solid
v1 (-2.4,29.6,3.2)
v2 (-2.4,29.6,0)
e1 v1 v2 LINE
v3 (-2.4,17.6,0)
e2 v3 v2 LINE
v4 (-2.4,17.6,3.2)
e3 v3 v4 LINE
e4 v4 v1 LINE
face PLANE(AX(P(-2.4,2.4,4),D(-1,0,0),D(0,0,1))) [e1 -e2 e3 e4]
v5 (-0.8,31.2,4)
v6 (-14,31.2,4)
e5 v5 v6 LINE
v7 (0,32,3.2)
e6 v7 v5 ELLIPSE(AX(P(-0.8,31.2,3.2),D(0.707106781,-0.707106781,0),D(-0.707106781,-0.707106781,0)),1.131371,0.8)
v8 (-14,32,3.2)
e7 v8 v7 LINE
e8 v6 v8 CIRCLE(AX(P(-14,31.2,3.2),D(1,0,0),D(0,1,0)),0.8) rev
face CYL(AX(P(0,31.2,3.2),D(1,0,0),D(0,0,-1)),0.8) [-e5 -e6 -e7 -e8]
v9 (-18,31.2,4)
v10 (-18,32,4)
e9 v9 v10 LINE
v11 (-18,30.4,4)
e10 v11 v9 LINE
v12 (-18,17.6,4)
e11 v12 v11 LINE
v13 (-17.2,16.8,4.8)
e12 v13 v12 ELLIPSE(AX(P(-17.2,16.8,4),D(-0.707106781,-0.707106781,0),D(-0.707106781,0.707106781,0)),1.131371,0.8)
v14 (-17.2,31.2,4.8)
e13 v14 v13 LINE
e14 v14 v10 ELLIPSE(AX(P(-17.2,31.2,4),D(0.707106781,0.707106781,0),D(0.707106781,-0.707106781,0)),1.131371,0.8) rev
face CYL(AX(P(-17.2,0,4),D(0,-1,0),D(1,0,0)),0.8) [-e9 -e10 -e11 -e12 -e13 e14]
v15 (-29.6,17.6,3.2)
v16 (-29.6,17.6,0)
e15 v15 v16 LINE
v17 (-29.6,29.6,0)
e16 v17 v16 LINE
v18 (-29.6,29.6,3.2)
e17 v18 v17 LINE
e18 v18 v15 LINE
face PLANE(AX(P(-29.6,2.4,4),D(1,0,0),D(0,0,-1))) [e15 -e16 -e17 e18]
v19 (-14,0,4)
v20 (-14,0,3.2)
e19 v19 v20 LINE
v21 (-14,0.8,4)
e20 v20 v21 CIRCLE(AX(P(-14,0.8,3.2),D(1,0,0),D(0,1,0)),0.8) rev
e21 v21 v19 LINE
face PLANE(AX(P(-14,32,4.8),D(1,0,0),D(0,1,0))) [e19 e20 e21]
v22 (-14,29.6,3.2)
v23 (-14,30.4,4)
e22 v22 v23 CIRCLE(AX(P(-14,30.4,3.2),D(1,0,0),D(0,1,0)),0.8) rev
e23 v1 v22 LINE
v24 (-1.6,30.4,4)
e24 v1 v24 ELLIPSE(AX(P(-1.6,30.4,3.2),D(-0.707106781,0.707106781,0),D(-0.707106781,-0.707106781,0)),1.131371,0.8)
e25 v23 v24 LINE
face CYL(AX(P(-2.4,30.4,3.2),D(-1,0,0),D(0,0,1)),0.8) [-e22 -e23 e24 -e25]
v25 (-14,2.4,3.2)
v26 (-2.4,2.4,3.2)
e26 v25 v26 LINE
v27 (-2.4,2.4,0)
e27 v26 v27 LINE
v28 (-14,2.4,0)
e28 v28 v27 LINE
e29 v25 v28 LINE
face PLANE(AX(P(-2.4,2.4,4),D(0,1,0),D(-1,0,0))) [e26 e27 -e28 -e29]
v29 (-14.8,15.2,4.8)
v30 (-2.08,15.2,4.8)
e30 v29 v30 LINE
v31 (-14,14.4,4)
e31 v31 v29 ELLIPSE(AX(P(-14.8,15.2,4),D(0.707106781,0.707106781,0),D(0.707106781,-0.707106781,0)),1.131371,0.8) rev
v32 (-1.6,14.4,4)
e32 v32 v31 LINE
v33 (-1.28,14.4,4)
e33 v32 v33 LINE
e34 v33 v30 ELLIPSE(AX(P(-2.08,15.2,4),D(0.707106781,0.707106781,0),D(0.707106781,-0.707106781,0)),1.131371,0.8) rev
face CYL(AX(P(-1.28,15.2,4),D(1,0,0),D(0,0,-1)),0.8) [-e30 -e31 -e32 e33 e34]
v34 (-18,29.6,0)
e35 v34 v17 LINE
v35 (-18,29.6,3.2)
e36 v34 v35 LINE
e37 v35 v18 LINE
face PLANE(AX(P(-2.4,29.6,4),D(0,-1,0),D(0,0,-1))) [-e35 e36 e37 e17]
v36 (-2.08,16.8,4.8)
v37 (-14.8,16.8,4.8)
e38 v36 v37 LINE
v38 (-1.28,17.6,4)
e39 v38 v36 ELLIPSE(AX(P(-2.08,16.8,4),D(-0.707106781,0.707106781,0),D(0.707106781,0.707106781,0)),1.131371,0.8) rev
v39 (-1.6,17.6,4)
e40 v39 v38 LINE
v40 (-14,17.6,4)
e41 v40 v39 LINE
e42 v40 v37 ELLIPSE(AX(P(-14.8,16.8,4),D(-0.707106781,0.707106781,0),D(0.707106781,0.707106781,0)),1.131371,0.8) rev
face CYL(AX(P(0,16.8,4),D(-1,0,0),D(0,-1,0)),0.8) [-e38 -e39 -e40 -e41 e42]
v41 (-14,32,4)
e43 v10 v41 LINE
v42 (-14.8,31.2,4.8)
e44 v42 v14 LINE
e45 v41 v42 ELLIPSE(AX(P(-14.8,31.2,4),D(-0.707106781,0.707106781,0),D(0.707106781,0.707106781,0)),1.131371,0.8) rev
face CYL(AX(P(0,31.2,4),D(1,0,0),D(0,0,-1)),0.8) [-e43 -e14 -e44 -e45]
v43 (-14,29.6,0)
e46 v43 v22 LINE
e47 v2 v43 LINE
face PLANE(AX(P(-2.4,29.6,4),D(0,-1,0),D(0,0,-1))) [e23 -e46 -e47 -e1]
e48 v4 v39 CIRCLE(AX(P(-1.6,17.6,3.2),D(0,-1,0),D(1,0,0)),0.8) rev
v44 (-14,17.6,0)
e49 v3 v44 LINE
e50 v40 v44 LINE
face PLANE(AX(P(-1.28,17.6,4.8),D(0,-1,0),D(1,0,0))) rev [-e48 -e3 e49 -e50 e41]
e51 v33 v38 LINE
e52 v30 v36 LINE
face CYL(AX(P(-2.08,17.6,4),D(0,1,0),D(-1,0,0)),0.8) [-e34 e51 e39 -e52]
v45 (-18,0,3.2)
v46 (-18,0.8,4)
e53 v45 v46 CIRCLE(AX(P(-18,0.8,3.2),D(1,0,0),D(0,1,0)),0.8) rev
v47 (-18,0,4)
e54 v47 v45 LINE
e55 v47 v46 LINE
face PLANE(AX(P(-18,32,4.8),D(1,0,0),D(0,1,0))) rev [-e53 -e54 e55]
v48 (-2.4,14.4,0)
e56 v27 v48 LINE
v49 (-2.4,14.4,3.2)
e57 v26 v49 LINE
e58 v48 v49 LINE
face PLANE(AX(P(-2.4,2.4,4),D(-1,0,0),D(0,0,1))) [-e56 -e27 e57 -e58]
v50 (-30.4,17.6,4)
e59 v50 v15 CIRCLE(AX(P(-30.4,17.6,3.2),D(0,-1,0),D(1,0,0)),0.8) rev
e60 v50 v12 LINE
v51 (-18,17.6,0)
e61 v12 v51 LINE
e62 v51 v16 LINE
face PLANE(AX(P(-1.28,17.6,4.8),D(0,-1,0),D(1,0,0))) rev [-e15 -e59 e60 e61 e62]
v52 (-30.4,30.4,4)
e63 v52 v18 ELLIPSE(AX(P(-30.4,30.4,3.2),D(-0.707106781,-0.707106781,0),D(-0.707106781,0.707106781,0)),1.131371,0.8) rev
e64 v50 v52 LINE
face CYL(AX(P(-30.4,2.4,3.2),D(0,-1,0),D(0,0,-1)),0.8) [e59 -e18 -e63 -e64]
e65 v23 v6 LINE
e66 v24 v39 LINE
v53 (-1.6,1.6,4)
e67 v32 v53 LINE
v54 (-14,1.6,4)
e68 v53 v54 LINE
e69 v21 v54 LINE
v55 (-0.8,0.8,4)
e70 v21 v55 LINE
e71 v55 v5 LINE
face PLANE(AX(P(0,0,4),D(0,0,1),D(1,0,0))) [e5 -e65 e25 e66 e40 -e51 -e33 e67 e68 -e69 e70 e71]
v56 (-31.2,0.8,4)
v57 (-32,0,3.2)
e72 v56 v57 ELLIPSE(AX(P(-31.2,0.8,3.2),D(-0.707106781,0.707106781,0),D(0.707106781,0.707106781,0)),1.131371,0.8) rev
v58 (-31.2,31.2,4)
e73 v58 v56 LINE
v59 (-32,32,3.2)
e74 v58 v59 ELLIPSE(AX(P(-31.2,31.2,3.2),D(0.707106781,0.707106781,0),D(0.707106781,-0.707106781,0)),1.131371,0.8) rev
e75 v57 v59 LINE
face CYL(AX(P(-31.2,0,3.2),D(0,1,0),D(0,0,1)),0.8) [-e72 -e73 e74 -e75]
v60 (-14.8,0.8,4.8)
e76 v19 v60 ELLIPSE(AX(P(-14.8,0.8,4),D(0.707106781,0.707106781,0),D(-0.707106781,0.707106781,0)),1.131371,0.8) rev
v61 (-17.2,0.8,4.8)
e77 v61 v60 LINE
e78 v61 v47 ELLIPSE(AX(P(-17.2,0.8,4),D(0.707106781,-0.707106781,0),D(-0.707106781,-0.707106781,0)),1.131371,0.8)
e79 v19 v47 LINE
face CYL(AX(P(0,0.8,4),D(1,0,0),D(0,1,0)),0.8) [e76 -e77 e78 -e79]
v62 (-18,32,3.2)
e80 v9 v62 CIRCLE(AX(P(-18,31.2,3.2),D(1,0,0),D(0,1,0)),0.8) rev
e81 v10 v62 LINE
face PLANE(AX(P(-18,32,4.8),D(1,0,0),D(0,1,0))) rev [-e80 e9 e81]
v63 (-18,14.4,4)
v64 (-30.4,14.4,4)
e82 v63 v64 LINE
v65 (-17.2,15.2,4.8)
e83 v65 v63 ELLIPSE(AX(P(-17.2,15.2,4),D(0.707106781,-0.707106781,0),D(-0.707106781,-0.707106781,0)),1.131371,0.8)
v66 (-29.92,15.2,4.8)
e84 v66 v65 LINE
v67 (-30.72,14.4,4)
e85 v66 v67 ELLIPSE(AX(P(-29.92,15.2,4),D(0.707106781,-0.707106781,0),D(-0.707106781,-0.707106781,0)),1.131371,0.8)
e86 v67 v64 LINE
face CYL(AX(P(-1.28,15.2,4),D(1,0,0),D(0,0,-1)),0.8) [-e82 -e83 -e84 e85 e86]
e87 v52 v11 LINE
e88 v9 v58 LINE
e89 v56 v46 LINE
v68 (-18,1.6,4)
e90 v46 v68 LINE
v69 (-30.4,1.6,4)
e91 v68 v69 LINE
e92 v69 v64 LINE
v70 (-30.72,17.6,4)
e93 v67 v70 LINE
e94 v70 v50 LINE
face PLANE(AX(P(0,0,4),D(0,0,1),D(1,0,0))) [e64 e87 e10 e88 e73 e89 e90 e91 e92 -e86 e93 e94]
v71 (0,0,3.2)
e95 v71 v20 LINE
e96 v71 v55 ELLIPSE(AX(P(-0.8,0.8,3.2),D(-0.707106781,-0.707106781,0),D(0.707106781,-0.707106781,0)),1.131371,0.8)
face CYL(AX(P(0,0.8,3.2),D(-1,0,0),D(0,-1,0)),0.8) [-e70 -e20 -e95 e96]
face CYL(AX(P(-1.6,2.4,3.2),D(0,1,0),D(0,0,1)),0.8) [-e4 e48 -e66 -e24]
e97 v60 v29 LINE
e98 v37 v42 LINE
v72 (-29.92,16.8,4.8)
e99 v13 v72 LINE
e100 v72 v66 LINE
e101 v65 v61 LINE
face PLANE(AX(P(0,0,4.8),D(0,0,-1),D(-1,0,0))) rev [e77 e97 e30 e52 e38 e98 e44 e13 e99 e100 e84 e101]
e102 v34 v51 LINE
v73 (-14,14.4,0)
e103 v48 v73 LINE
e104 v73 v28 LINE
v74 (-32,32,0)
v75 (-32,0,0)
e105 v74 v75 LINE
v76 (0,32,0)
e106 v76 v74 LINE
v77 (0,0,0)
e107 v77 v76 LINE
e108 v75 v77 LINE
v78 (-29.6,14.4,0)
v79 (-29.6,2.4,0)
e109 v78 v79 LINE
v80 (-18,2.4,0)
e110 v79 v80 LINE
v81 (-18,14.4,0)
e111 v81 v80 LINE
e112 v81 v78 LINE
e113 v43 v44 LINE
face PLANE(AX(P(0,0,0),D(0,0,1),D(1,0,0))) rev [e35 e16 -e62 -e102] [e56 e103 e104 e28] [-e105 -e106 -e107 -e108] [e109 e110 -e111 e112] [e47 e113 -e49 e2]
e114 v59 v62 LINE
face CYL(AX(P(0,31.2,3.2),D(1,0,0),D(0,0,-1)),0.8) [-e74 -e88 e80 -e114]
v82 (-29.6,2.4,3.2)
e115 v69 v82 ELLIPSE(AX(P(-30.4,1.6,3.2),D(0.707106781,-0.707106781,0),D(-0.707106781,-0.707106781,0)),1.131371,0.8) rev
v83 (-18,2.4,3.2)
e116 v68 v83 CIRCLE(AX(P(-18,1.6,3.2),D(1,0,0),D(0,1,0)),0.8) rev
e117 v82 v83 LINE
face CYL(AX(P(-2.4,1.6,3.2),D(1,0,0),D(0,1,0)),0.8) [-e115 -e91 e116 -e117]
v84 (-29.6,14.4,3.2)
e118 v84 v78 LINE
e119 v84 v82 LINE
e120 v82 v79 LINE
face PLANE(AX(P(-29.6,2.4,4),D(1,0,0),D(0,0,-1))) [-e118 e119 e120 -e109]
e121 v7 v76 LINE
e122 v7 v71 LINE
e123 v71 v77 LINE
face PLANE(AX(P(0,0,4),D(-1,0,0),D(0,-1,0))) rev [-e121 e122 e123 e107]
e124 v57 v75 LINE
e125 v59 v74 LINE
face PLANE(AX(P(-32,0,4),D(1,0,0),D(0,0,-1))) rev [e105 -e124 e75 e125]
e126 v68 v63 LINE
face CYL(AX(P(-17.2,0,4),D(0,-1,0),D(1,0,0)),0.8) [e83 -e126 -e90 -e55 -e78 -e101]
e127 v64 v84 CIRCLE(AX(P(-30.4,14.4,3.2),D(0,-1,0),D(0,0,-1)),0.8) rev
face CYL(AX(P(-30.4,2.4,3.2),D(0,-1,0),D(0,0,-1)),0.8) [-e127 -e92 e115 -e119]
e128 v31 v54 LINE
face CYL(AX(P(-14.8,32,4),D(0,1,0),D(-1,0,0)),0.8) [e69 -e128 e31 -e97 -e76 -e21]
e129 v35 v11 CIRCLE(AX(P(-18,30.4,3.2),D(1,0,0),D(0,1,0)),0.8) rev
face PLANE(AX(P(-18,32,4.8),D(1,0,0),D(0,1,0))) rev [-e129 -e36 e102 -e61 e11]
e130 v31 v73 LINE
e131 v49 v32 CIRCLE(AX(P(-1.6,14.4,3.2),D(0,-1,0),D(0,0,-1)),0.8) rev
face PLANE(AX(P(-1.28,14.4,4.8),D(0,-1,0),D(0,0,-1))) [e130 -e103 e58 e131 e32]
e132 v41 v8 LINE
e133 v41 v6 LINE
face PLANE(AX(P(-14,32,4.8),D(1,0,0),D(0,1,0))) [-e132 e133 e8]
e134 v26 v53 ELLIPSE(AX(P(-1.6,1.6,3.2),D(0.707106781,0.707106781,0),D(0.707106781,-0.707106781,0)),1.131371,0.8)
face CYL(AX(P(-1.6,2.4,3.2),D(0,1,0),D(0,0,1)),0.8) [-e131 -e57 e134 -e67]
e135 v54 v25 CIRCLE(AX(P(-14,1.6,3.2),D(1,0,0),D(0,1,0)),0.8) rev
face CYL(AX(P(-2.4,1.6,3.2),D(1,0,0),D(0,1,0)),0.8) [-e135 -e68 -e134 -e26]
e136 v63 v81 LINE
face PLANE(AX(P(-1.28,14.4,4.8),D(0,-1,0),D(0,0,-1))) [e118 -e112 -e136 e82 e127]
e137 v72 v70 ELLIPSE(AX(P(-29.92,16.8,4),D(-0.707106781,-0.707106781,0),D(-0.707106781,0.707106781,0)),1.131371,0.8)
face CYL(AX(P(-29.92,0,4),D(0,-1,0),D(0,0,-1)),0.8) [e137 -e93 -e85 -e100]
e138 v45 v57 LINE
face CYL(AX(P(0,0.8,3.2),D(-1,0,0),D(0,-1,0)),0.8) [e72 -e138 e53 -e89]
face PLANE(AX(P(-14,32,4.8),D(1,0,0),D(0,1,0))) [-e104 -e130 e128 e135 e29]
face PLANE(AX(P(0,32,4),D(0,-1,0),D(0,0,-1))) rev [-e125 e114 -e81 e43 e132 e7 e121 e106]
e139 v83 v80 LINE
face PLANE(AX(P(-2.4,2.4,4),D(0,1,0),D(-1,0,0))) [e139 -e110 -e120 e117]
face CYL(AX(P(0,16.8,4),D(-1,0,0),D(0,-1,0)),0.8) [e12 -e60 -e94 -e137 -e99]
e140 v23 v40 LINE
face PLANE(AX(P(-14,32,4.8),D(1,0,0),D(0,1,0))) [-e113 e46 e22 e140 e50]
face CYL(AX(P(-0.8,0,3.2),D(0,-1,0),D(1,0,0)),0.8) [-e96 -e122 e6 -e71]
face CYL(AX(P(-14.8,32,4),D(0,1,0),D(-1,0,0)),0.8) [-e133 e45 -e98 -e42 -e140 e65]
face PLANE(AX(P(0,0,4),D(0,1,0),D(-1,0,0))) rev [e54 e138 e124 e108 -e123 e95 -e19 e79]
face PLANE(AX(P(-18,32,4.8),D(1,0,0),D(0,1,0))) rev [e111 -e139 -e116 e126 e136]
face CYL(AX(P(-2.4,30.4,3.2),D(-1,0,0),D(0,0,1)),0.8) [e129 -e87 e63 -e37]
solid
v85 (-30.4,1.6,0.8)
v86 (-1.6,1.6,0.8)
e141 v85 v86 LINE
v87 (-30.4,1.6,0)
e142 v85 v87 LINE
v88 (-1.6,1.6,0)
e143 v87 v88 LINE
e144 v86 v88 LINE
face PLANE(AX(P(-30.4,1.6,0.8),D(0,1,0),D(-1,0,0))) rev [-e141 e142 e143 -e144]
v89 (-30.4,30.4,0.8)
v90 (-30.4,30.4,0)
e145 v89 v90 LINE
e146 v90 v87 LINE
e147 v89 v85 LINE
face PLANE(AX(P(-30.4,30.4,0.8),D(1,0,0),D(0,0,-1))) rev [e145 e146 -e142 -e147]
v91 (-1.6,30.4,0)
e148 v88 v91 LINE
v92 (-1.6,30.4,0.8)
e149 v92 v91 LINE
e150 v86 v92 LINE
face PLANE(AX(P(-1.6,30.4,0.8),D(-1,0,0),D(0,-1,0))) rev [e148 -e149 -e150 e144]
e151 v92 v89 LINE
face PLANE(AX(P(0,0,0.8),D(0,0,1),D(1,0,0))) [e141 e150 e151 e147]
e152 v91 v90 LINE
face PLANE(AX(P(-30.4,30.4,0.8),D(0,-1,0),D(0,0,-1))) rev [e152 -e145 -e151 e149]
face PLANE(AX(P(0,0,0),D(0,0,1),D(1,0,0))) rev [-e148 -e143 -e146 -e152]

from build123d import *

# Parameters (mm, degrees)
SKETCH1_W           = 400
SKETCH1_H           = 400
SKETCH1_W_2         = 340
SKETCH1_H_2         = 340
BOSS_EXTRUDE1_DEPTH = 50
FILLET1_R           = 10
SKETCH2_W           = 50
SKETCH2_H           = 400
SKETCH2_W_2         = 368
SKETCH2_H_2         = 40
BOSS_EXTRUDE2_DEPTH = 60
FILLET2_R           = 10
SKETCH4_W           = 360
SKETCH4_H           = 360
BOSS_EXTRUDE3_DEPTH = 10
SCALE1_SCALE        = 0.25
SCALE2_SCALE        = 0.32


with BuildPart() as part:
    # Sketch1 → Boss-Extrude1 (new body)
    with BuildSketch(Plane.XY):
        with Locations((-200, 200)):
            Rectangle(SKETCH1_W, SKETCH1_H)
        with Locations((-200, 200)):
            Rectangle(SKETCH1_W_2, SKETCH1_H_2, mode=Mode.SUBTRACT)
    extrude(amount=BOSS_EXTRUDE1_DEPTH)

    # Fillet1
    fillet1_edges = [part.edges().sort_by_distance(p)[0] for p in [
        (-400, 200, 50),
        (-200, 0, 50),
        (-200, 30, 50),
        (-30, 200, 50),
        (-200, 370, 50),
        (-370, 200, 50),
        (0, 200, 50),
        (-200, 400, 50),
    ]]
    fillet(fillet1_edges, radius=FILLET1_R)

    # Sketch2 → Boss-Extrude2 (add)
    with BuildSketch(Plane.XY):
        with Locations((-200, 200)):
            Rectangle(SKETCH2_W, SKETCH2_H)
        with Locations((-200, 200)):
            Rectangle(SKETCH2_W_2, SKETCH2_H_2)
    extrude(amount=BOSS_EXTRUDE2_DEPTH)

    # Fillet2
    fillet2_edges = [part.edges().sort_by_distance(p)[0] for p in [
        (-200, 0, 60),
        (-225, 90, 60),
        (-304.5, 180, 60),
        (-384, 200, 60),
        (-304.5, 220, 60),
        (-225, 310, 60),
        (-200, 400, 60),
        (-175, 310, 60),
        (-95.5, 220, 60),
        (-16, 200, 60),
        (-95.5, 180, 60),
        (-175, 90, 60),
    ]]
    fillet(fillet2_edges, radius=FILLET2_R - 0.0001)  # a hair under: the kernel refuses the full size


with BuildPart() as body_2:
    # Sketch4 → Boss-Extrude3 (new body)
    with BuildSketch(Plane.XY):
        with Locations((-200, 200)):
            Rectangle(SKETCH4_W, SKETCH4_H)
    extrude(amount=BOSS_EXTRUDE3_DEPTH)


with BuildPart() as part_1:
    # Scale1: scaled about (0, 0, 0)
    add(part.part.scale(SCALE1_SCALE))


with BuildPart() as body_2_1:
    # Scale1: scaled about (0, 0, 0)
    add(body_2.part.scale(SCALE1_SCALE))


with BuildPart() as body_2_2:
    # Scale2: scaled about (0, 0, 0)
    add(body_2_1.part.scale(SCALE2_SCALE))


with BuildPart() as part_2:
    # Scale2: scaled about (0, 0, 0)
    add(part_1.part.scale(SCALE2_SCALE))


solid = Compound([body_2_2.part, part_2.part])
